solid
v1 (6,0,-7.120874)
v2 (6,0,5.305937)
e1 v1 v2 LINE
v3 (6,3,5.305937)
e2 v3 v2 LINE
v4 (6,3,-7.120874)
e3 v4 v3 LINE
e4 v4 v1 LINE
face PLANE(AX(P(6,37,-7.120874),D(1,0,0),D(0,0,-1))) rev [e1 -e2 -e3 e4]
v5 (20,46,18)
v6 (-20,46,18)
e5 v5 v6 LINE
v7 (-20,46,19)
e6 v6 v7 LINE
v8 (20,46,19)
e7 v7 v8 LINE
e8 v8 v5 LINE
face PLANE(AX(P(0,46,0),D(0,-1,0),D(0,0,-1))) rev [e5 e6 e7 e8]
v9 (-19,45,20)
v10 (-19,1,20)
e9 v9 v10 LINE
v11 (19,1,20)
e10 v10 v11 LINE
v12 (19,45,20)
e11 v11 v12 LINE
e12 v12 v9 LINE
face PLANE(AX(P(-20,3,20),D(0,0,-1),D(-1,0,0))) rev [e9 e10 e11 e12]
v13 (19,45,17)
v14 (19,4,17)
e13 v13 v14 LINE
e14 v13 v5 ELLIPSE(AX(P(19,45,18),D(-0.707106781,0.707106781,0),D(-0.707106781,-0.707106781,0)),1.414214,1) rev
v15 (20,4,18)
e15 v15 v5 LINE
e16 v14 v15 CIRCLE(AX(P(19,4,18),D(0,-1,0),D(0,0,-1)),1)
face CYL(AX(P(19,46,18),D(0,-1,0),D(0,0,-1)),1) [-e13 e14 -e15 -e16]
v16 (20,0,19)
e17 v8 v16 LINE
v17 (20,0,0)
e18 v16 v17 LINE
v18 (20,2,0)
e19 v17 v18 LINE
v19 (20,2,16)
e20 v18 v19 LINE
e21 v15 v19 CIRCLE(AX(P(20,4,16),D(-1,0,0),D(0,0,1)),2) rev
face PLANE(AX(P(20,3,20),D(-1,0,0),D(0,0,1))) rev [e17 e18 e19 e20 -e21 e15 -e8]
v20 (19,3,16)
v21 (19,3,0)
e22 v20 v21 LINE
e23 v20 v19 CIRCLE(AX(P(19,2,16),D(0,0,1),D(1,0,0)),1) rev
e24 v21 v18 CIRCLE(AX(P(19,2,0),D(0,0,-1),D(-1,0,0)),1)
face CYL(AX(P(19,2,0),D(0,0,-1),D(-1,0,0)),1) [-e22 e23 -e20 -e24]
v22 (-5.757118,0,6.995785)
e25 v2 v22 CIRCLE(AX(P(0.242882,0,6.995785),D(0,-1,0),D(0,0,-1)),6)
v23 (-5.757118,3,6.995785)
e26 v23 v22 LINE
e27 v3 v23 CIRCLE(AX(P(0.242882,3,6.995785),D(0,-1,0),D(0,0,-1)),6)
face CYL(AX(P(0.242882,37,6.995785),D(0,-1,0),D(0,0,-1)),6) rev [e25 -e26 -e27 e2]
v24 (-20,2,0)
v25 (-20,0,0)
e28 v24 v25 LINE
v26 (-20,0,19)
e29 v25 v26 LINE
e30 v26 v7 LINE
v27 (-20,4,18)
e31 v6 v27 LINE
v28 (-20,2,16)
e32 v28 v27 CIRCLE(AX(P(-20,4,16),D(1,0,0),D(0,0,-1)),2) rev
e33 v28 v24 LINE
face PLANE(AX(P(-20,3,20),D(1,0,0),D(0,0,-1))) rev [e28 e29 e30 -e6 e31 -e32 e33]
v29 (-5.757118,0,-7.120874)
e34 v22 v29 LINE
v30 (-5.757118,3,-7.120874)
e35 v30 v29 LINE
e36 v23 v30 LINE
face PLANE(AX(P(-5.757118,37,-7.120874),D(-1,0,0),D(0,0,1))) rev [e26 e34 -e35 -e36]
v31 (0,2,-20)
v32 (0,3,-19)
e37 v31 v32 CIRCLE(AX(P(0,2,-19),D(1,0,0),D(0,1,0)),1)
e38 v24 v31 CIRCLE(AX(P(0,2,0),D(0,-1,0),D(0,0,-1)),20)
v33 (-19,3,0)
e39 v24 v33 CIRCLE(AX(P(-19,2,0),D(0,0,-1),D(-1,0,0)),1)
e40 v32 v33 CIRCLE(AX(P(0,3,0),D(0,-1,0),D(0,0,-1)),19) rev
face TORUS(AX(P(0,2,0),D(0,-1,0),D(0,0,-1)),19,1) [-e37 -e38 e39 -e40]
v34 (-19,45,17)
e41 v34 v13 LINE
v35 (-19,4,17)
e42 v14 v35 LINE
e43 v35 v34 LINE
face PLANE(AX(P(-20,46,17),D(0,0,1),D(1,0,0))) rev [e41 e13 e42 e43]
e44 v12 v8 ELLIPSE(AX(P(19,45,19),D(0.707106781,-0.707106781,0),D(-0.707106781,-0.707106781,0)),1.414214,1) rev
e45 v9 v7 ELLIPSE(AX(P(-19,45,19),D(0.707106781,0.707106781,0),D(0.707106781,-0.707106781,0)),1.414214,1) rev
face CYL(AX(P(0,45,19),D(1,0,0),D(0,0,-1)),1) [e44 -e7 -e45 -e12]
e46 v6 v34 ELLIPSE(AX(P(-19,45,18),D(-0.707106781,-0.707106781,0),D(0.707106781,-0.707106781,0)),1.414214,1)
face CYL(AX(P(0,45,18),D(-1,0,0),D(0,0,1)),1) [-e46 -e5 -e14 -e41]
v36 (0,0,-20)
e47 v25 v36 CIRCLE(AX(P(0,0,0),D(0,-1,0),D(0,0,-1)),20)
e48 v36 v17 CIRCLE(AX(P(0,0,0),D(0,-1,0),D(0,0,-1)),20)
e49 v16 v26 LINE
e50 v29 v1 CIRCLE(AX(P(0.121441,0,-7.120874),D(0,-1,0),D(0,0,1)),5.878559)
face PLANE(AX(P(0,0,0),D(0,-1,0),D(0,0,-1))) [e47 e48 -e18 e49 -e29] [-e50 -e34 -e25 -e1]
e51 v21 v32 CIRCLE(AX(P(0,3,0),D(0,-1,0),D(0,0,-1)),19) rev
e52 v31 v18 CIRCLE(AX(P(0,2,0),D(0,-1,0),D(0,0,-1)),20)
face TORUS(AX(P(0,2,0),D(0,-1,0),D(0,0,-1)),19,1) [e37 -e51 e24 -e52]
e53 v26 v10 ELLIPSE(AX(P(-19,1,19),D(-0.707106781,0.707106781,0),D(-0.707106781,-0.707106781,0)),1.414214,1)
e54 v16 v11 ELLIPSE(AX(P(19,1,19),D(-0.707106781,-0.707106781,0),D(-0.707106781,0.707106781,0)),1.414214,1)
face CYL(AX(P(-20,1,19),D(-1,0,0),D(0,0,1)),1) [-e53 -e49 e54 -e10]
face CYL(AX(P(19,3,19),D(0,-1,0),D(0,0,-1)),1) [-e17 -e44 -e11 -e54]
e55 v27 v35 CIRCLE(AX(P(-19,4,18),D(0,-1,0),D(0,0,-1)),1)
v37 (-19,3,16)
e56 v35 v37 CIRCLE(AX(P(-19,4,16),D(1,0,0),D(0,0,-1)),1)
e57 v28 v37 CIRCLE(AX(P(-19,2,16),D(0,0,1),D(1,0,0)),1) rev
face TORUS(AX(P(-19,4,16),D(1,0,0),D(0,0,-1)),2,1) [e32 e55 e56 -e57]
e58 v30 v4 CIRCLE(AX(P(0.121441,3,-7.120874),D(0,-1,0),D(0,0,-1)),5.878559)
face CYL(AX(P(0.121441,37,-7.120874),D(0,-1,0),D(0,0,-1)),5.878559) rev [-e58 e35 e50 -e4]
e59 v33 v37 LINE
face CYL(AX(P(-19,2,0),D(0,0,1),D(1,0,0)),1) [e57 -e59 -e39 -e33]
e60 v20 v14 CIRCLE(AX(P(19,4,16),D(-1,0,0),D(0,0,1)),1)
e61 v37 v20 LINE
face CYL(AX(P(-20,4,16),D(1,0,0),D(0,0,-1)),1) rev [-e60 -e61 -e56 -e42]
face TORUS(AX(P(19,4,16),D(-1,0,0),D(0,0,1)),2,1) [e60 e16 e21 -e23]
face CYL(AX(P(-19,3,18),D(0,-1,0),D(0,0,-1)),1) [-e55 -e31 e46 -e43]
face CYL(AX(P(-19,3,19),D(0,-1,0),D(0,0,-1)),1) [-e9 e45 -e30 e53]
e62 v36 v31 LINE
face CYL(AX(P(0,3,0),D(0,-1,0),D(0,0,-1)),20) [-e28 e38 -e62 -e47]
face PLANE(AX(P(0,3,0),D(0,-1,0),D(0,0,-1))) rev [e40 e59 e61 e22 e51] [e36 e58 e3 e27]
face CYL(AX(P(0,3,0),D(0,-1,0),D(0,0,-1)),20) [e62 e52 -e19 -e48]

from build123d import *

# Parameters (mm, degrees)
SKETCH2_W           = 40
SKETCH2_H           = 40
BOSS_EXTRUDE1_DEPTH = 3
SKETCH4_W           = 40
SKETCH4_H           = 3
BOSS_EXTRUDE2_DEPTH = 43
FILLET3_R           = 20
CUT_EXTRUDE1_DEPTH  = 37
FILLET4_R           = 1


with BuildPart() as part:
    # Sketch2 → Boss-Extrude1 (new body)
    with BuildSketch(Plane(origin=(0, 0, 0), x_dir=(1, 0, 0), z_dir=(0, 1, 0))):
        Rectangle(SKETCH2_W, SKETCH2_H)
    extrude(amount=BOSS_EXTRUDE1_DEPTH)

    # Sketch4 → Boss-Extrude2 (add)
    with BuildSketch(Plane(origin=(0, 3, 0), x_dir=(1, 0, 0), z_dir=(0, 1, 0))):
        with Locations((0, -18.5)):
            Rectangle(SKETCH4_W, SKETCH4_H)
    extrude(amount=BOSS_EXTRUDE2_DEPTH)

    # Fillet3
    fillet3_edges = [part.edges().sort_by_distance(p)[0] for p in [
        (20, 1.5, -20),
        (-20, 1.5, -20),
    ]]
    fillet(fillet3_edges, radius=FILLET3_R - 0.0001)  # a hair under: the kernel refuses the full size

    # Sketch5 → Cut-Extrude1 (cut)
    with BuildSketch(Plane.XZ):
        with BuildLine():
            Line((6, -7.120873555), (6, 5.305936672))
            ThreePointArc((6, 5.305936672), (1.096488494, 12.934754262), (-5.757118415, 6.995785055))
            Line((-5.757118415, 6.995785055), (-5.757118415, -7.120873555))
            ThreePointArc((-5.757118415, -7.120873555), (0.121440793, -12.999432762), (6, -7.120873555))
        make_face()
    extrude(amount=-CUT_EXTRUDE1_DEPTH, mode=Mode.SUBTRACT)

    # Fillet4
    fillet4_edges = [part.edges().sort_by_distance(p)[0] for p in [
        (20, 3, 8.49995),
        (-20, 24.5, 17),
        (0, 3, 17),
        (20, 24.5, 17),
        (0, 46, 20),
        (0, 46, 17),
        (-20, 3, 8.49995),
        (-14.142164913, 3, -14.142164913),
        (14.142164913, 3, -14.142164913),
        (0, 0, 20),
        (20, 23, 20),
        (-20, 23, 20),
    ]]
    fillet(fillet4_edges, radius=FILLET4_R)


solid = part.part
